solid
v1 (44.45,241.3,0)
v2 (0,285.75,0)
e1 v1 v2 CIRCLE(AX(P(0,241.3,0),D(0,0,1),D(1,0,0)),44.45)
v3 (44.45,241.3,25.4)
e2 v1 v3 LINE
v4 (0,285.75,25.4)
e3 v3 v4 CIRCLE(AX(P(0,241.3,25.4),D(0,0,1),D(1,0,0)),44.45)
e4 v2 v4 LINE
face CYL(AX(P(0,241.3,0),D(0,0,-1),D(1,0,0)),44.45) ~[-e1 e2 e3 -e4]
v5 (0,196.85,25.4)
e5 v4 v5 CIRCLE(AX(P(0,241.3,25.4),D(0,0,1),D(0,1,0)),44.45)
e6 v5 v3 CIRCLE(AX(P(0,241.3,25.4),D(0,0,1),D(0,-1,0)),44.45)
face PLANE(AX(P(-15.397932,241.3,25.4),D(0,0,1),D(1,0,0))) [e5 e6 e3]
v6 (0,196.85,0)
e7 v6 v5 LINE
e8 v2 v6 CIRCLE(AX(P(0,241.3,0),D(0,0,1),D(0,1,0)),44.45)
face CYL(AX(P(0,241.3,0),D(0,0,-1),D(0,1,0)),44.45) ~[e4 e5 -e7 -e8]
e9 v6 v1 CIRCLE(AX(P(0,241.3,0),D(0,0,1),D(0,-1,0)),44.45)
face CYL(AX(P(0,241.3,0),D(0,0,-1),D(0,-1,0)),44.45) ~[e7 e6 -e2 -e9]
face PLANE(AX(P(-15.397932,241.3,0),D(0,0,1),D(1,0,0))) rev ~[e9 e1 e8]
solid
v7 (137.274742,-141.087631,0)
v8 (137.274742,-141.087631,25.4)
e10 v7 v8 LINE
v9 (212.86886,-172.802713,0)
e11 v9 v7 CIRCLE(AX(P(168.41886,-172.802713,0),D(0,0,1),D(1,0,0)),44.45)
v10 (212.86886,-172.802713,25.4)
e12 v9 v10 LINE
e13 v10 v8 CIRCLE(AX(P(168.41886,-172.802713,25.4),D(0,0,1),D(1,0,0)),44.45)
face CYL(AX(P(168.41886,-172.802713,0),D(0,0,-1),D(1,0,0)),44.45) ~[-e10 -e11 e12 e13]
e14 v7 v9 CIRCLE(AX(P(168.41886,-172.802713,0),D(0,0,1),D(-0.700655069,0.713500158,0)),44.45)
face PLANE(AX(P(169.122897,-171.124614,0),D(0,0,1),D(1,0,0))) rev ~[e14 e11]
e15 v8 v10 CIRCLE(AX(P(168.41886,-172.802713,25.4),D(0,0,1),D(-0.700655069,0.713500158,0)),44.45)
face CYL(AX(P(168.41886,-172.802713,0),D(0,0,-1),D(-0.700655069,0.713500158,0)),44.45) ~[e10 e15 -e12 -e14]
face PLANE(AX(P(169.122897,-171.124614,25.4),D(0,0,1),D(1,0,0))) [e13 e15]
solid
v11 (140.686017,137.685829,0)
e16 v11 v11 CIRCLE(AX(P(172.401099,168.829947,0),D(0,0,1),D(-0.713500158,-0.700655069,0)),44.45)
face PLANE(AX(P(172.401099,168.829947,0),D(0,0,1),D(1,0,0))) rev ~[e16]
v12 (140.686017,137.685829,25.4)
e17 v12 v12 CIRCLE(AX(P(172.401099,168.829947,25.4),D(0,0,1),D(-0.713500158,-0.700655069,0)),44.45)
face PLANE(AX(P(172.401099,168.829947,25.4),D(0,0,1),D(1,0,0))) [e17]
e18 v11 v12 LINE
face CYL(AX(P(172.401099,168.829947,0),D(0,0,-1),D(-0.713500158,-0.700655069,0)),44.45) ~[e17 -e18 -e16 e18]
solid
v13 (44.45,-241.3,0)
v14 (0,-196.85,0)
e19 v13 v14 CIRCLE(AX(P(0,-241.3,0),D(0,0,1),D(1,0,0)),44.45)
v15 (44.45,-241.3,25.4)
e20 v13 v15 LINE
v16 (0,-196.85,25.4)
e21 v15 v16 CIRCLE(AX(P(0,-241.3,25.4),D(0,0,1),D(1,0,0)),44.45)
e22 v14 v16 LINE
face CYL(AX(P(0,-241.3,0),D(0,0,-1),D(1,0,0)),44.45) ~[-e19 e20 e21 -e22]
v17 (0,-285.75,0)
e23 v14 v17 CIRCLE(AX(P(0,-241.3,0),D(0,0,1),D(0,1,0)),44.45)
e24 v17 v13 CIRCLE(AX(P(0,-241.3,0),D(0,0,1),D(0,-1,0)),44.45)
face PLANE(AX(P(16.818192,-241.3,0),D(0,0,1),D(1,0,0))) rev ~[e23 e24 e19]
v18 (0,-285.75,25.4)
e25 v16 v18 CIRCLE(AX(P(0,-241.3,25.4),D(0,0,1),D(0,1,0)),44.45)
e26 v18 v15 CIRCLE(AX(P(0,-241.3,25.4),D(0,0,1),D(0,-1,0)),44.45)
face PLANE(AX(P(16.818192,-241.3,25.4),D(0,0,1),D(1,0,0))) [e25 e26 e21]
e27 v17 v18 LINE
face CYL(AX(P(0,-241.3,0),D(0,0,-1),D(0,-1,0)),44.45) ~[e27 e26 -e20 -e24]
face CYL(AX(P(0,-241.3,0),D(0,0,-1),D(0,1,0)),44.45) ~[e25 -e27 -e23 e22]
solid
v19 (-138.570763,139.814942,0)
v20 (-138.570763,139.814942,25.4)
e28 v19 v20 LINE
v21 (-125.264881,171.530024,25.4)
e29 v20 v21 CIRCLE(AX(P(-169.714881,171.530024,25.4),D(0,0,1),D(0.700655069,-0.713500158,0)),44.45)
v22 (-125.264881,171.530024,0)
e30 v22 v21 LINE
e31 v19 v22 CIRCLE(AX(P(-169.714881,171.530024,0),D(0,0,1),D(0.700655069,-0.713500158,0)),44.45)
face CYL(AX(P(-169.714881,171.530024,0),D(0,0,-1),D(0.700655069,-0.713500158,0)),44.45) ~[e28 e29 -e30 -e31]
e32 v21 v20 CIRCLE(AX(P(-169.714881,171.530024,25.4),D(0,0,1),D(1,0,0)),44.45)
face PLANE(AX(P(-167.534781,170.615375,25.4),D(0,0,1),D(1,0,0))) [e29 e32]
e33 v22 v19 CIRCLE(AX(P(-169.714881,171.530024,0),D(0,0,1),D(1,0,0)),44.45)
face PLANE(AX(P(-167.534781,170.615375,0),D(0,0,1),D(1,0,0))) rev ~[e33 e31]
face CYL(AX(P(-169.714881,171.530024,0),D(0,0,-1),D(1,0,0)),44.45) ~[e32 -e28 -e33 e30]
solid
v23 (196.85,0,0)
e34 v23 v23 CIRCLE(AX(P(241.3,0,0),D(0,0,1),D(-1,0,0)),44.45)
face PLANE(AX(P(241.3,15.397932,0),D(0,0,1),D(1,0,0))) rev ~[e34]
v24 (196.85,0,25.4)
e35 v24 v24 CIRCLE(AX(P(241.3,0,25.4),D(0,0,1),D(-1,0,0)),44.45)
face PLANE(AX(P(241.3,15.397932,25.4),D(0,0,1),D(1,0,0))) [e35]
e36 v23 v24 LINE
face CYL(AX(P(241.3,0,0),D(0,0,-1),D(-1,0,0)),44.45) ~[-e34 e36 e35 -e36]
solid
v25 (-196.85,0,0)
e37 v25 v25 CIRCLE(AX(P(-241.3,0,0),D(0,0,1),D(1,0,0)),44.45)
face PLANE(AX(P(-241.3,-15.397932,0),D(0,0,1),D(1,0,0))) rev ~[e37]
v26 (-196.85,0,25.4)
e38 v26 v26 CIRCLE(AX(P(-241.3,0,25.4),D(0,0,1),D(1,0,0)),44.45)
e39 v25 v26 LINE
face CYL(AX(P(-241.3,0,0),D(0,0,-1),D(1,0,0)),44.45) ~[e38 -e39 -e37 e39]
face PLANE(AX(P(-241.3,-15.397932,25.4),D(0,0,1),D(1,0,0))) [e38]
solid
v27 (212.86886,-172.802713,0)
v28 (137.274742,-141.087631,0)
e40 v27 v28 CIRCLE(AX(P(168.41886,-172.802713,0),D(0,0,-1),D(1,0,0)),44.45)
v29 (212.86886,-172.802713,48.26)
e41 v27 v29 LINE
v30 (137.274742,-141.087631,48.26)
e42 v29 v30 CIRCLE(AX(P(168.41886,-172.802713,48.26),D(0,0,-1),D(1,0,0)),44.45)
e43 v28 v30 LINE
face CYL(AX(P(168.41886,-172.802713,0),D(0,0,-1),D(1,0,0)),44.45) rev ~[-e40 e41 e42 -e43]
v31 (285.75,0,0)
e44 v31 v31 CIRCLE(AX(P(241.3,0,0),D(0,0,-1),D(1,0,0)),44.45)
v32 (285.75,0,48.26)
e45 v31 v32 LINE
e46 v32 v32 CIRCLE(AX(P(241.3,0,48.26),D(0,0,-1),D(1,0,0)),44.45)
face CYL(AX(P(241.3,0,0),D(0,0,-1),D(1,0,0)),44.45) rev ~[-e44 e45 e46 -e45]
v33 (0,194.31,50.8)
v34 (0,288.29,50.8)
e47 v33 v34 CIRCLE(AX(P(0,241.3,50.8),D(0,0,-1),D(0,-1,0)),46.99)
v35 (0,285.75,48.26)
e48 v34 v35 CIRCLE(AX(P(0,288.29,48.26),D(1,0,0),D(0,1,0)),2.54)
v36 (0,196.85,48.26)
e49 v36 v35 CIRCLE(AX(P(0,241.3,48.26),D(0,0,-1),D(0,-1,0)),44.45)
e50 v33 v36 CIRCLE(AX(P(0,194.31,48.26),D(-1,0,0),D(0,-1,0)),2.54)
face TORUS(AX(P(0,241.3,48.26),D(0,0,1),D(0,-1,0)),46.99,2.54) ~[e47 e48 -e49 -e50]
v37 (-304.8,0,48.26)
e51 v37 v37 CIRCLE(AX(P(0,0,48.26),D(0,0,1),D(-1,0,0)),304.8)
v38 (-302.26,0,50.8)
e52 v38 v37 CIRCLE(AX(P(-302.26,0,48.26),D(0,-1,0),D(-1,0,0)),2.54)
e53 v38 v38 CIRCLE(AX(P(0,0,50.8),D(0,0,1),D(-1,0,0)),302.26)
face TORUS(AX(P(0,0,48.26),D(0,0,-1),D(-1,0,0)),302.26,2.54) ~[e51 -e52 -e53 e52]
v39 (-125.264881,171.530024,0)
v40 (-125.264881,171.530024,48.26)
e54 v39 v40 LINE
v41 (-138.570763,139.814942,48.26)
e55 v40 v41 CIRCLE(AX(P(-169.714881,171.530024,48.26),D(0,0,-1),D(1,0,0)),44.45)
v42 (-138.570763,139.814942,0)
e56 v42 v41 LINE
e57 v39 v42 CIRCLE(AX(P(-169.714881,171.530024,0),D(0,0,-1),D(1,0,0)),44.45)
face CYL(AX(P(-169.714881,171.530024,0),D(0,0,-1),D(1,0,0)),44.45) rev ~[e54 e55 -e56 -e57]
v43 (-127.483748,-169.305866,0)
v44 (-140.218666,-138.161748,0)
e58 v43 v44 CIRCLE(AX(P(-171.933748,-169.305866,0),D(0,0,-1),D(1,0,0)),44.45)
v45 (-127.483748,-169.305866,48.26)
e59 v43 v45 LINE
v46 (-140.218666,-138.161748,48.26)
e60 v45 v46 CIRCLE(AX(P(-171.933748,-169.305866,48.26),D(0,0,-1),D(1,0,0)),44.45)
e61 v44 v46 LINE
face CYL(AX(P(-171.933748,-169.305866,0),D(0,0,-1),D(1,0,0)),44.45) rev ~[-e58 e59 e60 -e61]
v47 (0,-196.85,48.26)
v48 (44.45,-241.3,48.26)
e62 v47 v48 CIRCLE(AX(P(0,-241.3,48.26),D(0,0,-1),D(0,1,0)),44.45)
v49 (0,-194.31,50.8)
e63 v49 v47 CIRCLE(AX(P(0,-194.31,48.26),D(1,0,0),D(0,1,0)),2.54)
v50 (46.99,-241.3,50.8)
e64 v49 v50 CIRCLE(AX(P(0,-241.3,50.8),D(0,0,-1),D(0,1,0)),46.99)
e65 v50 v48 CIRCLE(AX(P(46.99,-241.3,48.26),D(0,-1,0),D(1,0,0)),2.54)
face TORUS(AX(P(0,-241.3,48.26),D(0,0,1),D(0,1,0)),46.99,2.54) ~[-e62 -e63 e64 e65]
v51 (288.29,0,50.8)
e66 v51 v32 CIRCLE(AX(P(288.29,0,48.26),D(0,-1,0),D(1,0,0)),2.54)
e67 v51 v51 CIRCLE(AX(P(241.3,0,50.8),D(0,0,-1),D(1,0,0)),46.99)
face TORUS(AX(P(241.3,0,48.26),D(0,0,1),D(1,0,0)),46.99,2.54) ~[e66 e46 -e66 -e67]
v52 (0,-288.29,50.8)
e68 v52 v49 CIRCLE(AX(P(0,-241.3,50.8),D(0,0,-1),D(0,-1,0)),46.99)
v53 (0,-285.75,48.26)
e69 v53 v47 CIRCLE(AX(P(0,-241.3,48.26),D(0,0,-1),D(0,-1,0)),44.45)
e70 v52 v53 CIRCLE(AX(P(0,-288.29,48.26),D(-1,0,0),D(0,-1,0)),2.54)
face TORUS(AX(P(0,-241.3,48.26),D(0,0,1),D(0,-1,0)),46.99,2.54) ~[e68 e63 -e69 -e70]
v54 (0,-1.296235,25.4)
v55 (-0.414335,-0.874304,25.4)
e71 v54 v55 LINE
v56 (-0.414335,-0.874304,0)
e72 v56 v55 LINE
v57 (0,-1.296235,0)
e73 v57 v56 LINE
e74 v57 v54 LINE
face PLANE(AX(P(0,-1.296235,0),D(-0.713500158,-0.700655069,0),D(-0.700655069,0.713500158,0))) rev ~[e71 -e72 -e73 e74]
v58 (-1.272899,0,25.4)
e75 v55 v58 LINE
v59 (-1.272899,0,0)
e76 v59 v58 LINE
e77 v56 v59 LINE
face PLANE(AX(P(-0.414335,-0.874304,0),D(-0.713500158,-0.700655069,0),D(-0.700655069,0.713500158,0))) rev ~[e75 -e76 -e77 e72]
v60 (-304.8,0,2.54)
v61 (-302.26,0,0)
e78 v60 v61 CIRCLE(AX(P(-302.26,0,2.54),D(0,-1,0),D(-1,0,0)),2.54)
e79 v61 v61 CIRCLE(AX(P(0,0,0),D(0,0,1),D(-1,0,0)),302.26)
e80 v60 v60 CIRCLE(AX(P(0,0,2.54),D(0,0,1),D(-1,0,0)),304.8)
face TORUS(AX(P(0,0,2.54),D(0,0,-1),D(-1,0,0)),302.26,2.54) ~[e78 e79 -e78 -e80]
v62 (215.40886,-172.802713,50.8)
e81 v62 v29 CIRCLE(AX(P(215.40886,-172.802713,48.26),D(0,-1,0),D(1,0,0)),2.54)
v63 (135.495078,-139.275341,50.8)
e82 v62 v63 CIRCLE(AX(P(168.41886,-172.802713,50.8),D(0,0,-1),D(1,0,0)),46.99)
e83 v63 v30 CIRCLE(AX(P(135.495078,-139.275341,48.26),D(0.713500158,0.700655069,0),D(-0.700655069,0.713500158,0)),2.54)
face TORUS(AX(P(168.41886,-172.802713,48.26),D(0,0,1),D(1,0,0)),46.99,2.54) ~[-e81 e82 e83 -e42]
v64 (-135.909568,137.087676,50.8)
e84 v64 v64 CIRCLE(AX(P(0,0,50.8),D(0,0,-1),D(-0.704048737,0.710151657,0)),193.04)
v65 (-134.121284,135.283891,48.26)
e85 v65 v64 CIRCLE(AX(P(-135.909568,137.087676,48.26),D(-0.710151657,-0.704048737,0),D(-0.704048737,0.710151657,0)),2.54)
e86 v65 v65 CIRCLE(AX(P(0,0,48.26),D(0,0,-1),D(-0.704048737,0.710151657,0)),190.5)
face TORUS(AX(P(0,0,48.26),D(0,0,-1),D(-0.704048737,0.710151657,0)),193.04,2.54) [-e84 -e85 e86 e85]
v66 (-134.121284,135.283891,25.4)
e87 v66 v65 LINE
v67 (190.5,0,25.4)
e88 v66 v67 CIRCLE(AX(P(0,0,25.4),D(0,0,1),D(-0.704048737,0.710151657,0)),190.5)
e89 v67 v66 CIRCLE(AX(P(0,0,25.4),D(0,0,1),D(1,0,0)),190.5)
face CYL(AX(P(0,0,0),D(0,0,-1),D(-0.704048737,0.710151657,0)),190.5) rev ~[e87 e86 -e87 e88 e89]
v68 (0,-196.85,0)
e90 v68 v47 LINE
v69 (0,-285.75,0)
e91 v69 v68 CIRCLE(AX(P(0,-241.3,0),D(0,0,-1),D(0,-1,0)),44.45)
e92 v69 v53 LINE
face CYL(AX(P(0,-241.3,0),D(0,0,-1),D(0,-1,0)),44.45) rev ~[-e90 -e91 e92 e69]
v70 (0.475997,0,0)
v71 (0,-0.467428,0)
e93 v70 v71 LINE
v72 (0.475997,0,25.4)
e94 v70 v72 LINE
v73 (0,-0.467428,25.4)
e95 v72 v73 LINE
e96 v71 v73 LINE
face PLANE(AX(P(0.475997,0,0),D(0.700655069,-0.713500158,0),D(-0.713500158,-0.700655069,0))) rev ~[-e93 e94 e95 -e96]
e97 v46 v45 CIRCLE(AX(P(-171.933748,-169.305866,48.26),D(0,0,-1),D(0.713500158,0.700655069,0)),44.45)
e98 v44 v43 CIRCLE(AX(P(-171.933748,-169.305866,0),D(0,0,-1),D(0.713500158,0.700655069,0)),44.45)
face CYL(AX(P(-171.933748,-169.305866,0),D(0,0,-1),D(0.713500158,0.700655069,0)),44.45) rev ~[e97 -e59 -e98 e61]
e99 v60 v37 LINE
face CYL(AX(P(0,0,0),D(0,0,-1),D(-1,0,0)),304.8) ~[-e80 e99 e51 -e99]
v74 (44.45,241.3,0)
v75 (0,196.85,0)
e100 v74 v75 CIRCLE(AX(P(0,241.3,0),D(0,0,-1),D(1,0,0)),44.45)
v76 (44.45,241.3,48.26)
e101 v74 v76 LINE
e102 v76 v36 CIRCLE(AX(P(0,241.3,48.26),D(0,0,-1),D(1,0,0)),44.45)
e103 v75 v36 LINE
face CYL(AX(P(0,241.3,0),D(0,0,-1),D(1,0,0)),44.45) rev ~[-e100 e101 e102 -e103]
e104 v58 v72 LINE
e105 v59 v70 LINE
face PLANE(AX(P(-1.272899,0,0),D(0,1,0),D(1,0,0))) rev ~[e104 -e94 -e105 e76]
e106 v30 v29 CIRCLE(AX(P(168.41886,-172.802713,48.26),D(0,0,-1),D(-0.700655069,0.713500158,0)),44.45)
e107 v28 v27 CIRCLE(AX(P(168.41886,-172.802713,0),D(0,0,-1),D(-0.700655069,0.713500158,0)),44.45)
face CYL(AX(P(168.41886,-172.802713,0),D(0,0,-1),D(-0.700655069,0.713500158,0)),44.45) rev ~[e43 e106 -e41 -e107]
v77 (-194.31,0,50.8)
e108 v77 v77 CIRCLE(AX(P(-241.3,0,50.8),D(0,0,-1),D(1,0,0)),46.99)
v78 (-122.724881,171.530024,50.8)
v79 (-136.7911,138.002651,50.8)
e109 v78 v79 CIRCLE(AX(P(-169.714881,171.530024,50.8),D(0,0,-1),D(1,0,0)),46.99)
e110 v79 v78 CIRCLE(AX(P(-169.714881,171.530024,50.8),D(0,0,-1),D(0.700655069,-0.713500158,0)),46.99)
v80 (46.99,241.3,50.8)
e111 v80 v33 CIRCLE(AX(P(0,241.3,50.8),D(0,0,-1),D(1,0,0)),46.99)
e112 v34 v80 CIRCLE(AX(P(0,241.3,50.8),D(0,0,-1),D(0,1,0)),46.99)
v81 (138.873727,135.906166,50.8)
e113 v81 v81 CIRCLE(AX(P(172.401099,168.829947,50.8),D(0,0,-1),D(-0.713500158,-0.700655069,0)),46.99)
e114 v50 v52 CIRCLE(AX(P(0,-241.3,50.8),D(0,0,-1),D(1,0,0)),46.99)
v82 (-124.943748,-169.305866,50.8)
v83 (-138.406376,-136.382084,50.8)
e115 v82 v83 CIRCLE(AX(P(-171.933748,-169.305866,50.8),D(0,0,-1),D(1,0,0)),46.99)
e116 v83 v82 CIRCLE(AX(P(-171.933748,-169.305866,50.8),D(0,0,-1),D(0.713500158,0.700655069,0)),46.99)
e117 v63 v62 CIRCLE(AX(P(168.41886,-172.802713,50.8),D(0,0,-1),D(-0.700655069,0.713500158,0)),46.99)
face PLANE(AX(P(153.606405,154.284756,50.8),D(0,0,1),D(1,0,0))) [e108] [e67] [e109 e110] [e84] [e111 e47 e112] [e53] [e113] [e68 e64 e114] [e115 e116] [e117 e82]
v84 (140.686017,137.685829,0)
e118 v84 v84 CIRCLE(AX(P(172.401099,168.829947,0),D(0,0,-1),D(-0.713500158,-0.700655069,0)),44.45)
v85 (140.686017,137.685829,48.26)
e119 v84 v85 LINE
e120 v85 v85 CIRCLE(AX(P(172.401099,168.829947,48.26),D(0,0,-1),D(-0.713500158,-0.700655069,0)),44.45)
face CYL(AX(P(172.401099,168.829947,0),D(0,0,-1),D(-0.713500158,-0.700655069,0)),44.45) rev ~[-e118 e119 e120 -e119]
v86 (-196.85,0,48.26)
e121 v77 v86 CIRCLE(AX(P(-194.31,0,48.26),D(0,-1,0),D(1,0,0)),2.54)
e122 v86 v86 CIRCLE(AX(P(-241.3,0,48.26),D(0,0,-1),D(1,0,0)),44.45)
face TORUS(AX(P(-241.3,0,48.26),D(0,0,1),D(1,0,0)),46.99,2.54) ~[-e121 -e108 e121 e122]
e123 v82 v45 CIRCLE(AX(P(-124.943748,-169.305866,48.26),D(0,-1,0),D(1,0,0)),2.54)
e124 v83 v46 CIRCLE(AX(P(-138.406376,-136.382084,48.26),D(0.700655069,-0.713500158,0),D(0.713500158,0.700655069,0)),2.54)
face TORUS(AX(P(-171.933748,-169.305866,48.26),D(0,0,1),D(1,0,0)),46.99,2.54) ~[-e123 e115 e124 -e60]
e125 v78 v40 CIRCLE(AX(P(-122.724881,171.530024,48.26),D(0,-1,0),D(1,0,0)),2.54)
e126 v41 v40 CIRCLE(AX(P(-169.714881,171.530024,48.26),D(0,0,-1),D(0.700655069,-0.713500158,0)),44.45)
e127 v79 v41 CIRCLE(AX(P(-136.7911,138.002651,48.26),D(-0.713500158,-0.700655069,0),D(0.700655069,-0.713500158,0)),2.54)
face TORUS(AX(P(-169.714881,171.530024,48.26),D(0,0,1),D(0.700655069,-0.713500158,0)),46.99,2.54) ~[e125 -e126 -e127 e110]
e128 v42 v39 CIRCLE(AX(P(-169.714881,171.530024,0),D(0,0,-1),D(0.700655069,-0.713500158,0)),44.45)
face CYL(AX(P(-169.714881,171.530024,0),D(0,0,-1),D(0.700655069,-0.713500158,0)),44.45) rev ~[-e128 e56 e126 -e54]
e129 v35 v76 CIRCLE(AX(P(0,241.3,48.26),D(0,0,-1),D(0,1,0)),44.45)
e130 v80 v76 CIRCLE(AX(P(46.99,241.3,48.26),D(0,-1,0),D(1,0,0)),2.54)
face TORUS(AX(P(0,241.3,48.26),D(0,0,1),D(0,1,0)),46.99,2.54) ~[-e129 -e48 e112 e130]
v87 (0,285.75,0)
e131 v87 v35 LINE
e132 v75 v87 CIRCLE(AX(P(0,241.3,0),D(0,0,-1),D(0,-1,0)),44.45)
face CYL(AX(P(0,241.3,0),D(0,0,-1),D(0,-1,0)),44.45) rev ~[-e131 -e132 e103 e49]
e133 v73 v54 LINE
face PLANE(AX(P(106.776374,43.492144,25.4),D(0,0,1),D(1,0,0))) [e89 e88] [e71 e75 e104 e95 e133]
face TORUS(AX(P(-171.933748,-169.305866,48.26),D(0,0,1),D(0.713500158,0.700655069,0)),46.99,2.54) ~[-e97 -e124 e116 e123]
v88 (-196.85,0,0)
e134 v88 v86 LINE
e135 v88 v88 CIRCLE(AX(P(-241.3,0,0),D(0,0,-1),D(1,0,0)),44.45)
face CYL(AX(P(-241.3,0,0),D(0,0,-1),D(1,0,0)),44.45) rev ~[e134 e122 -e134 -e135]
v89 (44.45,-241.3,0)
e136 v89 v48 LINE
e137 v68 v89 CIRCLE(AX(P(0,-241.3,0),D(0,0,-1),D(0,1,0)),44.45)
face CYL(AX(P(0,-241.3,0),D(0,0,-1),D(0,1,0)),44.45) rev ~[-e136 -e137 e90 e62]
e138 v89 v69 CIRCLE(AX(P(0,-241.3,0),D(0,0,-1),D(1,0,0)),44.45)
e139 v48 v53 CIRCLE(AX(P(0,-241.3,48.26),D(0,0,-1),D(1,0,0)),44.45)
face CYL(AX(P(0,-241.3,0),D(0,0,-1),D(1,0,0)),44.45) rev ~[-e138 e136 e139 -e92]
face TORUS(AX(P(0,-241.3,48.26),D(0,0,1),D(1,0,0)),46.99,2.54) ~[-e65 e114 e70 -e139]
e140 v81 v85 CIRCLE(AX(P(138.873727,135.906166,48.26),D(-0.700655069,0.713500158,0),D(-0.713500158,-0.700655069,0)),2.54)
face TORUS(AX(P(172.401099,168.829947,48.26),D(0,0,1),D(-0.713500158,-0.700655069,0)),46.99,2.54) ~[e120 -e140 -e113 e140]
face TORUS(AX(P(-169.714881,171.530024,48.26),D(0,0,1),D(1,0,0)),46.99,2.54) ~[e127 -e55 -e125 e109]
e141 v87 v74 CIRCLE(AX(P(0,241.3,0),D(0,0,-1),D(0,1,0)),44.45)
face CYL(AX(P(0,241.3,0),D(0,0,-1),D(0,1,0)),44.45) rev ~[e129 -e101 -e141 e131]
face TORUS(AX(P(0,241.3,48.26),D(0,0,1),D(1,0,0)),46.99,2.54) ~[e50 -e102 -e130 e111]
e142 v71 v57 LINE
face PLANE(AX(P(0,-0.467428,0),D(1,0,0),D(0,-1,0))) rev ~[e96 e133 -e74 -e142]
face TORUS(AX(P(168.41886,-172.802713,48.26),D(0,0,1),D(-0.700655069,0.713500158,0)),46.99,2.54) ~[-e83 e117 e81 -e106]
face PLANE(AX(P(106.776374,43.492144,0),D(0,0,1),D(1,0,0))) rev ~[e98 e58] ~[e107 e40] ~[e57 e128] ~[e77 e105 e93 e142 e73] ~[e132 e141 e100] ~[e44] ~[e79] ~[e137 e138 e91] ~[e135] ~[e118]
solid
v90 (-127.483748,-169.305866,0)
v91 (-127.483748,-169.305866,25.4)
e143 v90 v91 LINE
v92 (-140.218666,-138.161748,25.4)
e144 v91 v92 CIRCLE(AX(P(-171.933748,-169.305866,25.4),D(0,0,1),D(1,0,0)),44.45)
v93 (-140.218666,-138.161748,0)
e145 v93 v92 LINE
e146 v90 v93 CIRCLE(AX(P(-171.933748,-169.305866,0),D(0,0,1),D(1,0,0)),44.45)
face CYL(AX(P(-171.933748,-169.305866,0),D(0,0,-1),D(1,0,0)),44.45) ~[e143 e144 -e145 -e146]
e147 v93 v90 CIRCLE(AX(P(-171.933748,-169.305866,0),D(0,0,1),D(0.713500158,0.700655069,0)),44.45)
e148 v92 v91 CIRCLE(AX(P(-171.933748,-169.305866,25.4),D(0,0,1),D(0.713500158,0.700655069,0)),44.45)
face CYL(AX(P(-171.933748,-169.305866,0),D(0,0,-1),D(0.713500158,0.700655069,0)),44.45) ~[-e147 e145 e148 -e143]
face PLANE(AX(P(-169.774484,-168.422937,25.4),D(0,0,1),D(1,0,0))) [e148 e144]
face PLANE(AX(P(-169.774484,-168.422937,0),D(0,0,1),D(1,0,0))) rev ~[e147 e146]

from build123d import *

# Parameters (mm, degrees)
F1_DEPTH = 50.8
F2_DEPTH = 25.4
F3_DEPTH = 25.4
F4_R     = 2.54


with BuildPart() as f1:
    # F0 (on Top) → F1 (new body)
    with BuildSketch(Plane.XY):
        with BuildLine():
            Line((285.75, 0), (304.8, 0))
            ThreePointArc((304.8, 0), (215.5261469057, 215.5261469057), (0, 304.8))
            Line((0, 304.8), (0, 285.75))
            ThreePointArc((0, 285.75), (31.4308964237, 272.7308964237), (44.45, 241.3))
            ThreePointArc((44.45, 241.3), (31.4308964237, 209.8691035763), (0, 196.85))
            Line((0, 196.85), (0, 190.5))
            ThreePointArc((0, 190.5), (73.853478682, 175.6015765492), (136.1552471412, 133.2366266306))
            ThreePointArc((136.1552471412, 133.2366266306), (176.3913611552, 71.9467699747), (190.5, 0))
            Line((190.5, 0), (196.85, 0))
            ThreePointArc((196.85, 0), (241.3, 44.45), (285.75, 0))
        make_face()
        with BuildLine():
            ThreePointArc((216.8510989977, 168.8299471788), (189.2247000531, 127.686673761), (140.6860169942, 137.6858293793))
            ThreePointArc((140.6860169942, 137.6858293793), (155.5774979423, 209.9732205965), (216.8510989977, 168.8299471788))
        make_face(mode=Mode.SUBTRACT)
        with BuildLine():
            ThreePointArc((0, -304.8), (215.5261469057, -215.5261469057), (304.8, 0))
            Line((304.8, 0), (285.75, 0))
            ThreePointArc((285.75, 0), (241.3, -44.45), (196.85, 0))
            Line((196.85, 0), (190.5, 0))
            ThreePointArc((190.5, 0), (175.4899748966, -74.1182751471), (132.825262879, -136.5565799994))
            ThreePointArc((132.825262879, -136.5565799994), (71.6806163133, -176.499686246), (0, -190.5))
            Line((0, -190.5), (0, -196.85))
            ThreePointArc((0, -196.85), (31.4308964237, -209.8691035763), (44.45, -241.3))
            ThreePointArc((44.45, -241.3), (31.4308964237, -272.7308964237), (0, -285.75))
            Line((0, -285.75), (0, -304.8))
        make_face()
        with BuildLine():
            ThreePointArc((212.8688597149, -172.8027132088), (151.2222544713, -213.791483233), (137.2747419154, -141.0876312053))
            ThreePointArc((137.2747419154, -141.0876312053), (185.6154649585, -131.8139431847), (212.8688597149, -172.8027132088))
        make_face(mode=Mode.SUBTRACT)
        with BuildLine():
            Line((0, 285.75), (0, 304.8))
            ThreePointArc((0, 304.8), (-215.5261469057, 215.5261469057), (-304.8, 0))
            Line((-304.8, 0), (-285.75, 0))
            ThreePointArc((-285.75, 0), (-241.3, 44.45), (-196.85, 0))
            Line((-196.85, 0), (-190.5, 0))
            ThreePointArc((-190.5, 0), (-175.8413413963, 73.2807795807), (-134.1212844519, 135.283890604))
            ThreePointArc((-134.1212844519, 135.283890604), (-72.5212687421, 176.1559410864), (0, 190.5))
            Line((0, 190.5), (0, 196.85))
            ThreePointArc((0, 196.85), (-44.45, 241.3), (0, 285.75))
        make_face()
        with BuildLine():
            ThreePointArc((-125.2648812879, 171.5300238135), (-128.7261112637, 154.3334185698), (-138.5707634883, 139.81494181))
            ThreePointArc((-138.5707634883, 139.81494181), (-210.703651312, 188.7266290571), (-125.2648812879, 171.5300238135))
        make_face(mode=Mode.SUBTRACT)
        with BuildLine():
            ThreePointArc((-304.8, 0), (-215.5261469057, -215.5261469057), (0, -304.8))
            Line((0, -304.8), (0, -285.75))
            ThreePointArc((0, -285.75), (-44.45, -241.3), (0, -196.85))
            Line((0, -196.85), (0, -190.5))
            ThreePointArc((0, -190.5), (-73.5459383628, -175.7306033403), (-135.6878962911, -133.7125454103))
            ThreePointArc((-135.6878962911, -133.7125454103), (-176.265133029, -72.2554695388), (-190.5, 0))
            Line((-190.5, 0), (-196.85, 0))
            ThreePointArc((-196.85, 0), (-241.3, -44.45), (-285.75, 0))
            Line((-285.75, 0), (-304.8, 0))
        make_face()
        with BuildLine():
            ThreePointArc((-127.4837481475, -169.3058659585), (-213.0770215653, -186.1294670139), (-140.218666144, -138.1617481589))
            ThreePointArc((-140.218666144, -138.1617481589), (-130.7904747298, -152.482264903), (-127.4837481475, -169.3058659585))
        make_face(mode=Mode.SUBTRACT)
    extrude(amount=F1_DEPTH)

    # F0 (on Top) → F2, piece 9 (join)
    with BuildSketch(Plane.XY):
        with BuildLine():
            Line((0.4759973175, 0), (190.5, 0))
            ThreePointArc((190.5, 0), (176.3913611552, 71.9467699747), (136.1552471412, 133.2366266306))
            Line((136.1552471412, 133.2366266306), (0.4759973175, 0))
        make_face()
        with BuildLine():
            ThreePointArc((132.825262879, -136.5565799994), (175.4899748966, -74.1182751471), (190.5, 0))
            Line((190.5, 0), (0.4759973175, 0))
            Line((0.4759973175, 0), (0, -0.467427974))
            Line((0, -0.467427974), (0, -1.296235447))
            Line((0, -1.296235447), (132.825262879, -136.5565799994))
        make_face()
        with BuildLine():
            Line((0, 0), (0, 190.5))
            ThreePointArc((0, 190.5), (-72.5212687421, 176.1559410864), (-134.1212844519, 135.283890604))
            Line((-134.1212844519, 135.283890604), (-1.2728994191, 0))
            Line((-1.2728994191, 0), (0, 0))
        make_face()
        with BuildLine():
            ThreePointArc((136.1552471412, 133.2366266306), (73.853478682, 175.6015765492), (0, 190.5))
            Line((0, 190.5), (0, 0))
            Line((0, 0), (0.4759973175, 0))
            Line((0.4759973175, 0), (136.1552471412, 133.2366266306))
        make_face()
        with BuildLine():
            Line((0, -1.296235447), (0, -190.5))
            ThreePointArc((0, -190.5), (71.6806163133, -176.499686246), (132.825262879, -136.5565799994))
            Line((132.825262879, -136.5565799994), (0, -1.296235447))
        make_face()
        with BuildLine():
            ThreePointArc((-135.6878962911, -133.7125454103), (-73.5459383628, -175.7306033403), (0, -190.5))
            Line((0, -190.5), (0, -1.296235447))
            Line((0, -1.296235447), (-0.4143353614, -0.8743040875))
            Line((-0.4143353614, -0.8743040875), (-135.6878962911, -133.7125454103))
        make_face()
        with BuildLine():
            Line((-1.2728994191, 0), (-190.5, 0))
            ThreePointArc((-190.5, 0), (-176.265133029, -72.2554695388), (-135.6878962911, -133.7125454103))
            Line((-135.6878962911, -133.7125454103), (-0.4143353614, -0.8743040875))
            Line((-0.4143353614, -0.8743040875), (-1.2728994191, 0))
        make_face()
        with BuildLine():
            ThreePointArc((-134.1212844519, 135.283890604), (-175.8413413963, 73.2807795807), (-190.5, 0))
            Line((-190.5, 0), (-1.2728994191, 0))
            Line((-1.2728994191, 0), (-134.1212844519, 135.283890604))
        make_face()
    extrude(amount=F2_DEPTH)

    # F0 (on Top) → F3 (join)
    with BuildSketch(Plane.XY):
        with BuildLine():
            Line((-1.2728994191, 0), (-190.5, 0))
            ThreePointArc((-190.5, 0), (-176.265133029, -72.2554695388), (-135.6878962911, -133.7125454103))
            Line((-135.6878962911, -133.7125454103), (-0.4143353614, -0.8743040875))
            Line((-0.4143353614, -0.8743040875), (-1.2728994191, 0))
        make_face()
        with BuildLine():
            ThreePointArc((-135.6878962911, -133.7125454103), (-73.5459383628, -175.7306033403), (0, -190.5))
            Line((0, -190.5), (0, -1.296235447))
            Line((0, -1.296235447), (-0.4143353614, -0.8743040875))
            Line((-0.4143353614, -0.8743040875), (-135.6878962911, -133.7125454103))
        make_face()
        with BuildLine():
            Line((0, -1.296235447), (0, -190.5))
            ThreePointArc((0, -190.5), (71.6806163133, -176.499686246), (132.825262879, -136.5565799994))
            Line((132.825262879, -136.5565799994), (0, -1.296235447))
        make_face()
        with BuildLine():
            ThreePointArc((132.825262879, -136.5565799994), (175.4899748966, -74.1182751471), (190.5, 0))
            Line((190.5, 0), (0.4759973175, 0))
            Line((0.4759973175, 0), (0, -0.467427974))
            Line((0, -0.467427974), (0, -1.296235447))
            Line((0, -1.296235447), (132.825262879, -136.5565799994))
        make_face()
        with BuildLine():
            Line((0.4759973175, 0), (190.5, 0))
            ThreePointArc((190.5, 0), (176.3913611552, 71.9467699747), (136.1552471412, 133.2366266306))
            Line((136.1552471412, 133.2366266306), (0.4759973175, 0))
        make_face()
        with BuildLine():
            ThreePointArc((136.1552471412, 133.2366266306), (73.853478682, 175.6015765492), (0, 190.5))
            Line((0, 190.5), (0, 0))
            Line((0, 0), (0.4759973175, 0))
            Line((0.4759973175, 0), (136.1552471412, 133.2366266306))
        make_face()
        with BuildLine():
            Line((0, 0), (0, 190.5))
            ThreePointArc((0, 190.5), (-72.5212687421, 176.1559410864), (-134.1212844519, 135.283890604))
            Line((-134.1212844519, 135.283890604), (-1.2728994191, 0))
            Line((-1.2728994191, 0), (0, 0))
        make_face()
        with BuildLine():
            ThreePointArc((-134.1212844519, 135.283890604), (-175.8413413963, 73.2807795807), (-190.5, 0))
            Line((-190.5, 0), (-1.2728994191, 0))
            Line((-1.2728994191, 0), (-134.1212844519, 135.283890604))
        make_face()
    extrude(amount=F3_DEPTH)

    # F4
    f4_edges = [f1.edges().sort_by_distance(p)[0] for p in [
        (196.85, 0, 50.8),
        (0, 285.75, 50.8),
        (0, -196.85, 50.8),
        (304.8, 0, 50.8),
        (-285.75, 0, 50.8),
        (0, 190.5, 50.8),
        (204.116181, 199.974065, 50.8),
        (199.562978, -204.517795, 50.8),
        (-214.164881, 171.530024, 50.8),
        (-203.64883, -200.449984, 50.8),
        (304.8, 0, 0),
    ]]
    fillet(f4_edges, radius=F4_R)


with BuildPart() as f2:
    # F0 (on Top) → F2 (new body)
    with BuildSketch(Plane.XY):
        with BuildLine():
            ThreePointArc((216.8510989977, 168.8299471788), (155.5774979423, 209.9732205965), (140.6860169942, 137.6858293793))
            ThreePointArc((140.6860169942, 137.6858293793), (189.2247000531, 127.686673761), (216.8510989977, 168.8299471788))
        make_face()
    extrude(amount=F2_DEPTH)


with BuildPart() as f2b:
    # F0 (on Top) → F2, piece 2 (new body)
    with BuildSketch(Plane.XY):
        with BuildLine():
            ThreePointArc((212.8688597149, -172.8027132088), (185.6154649585, -131.8139431847), (137.2747419154, -141.0876312053))
            ThreePointArc((137.2747419154, -141.0876312053), (151.2222544713, -213.791483233), (212.8688597149, -172.8027132088))
        make_face()
    extrude(amount=F2_DEPTH)


with BuildPart() as f2c:
    # F0 (on Top) → F2, piece 3 (new body)
    with BuildSketch(Plane.XY):
        with BuildLine():
            ThreePointArc((-125.2648812879, 171.5300238135), (-210.703651312, 188.7266290571), (-138.5707634883, 139.81494181))
            ThreePointArc((-138.5707634883, 139.81494181), (-128.7261112637, 154.3334185698), (-125.2648812879, 171.5300238135))
        make_face()
    extrude(amount=F2_DEPTH)


with BuildPart() as f2d:
    # F0 (on Top) → F2, piece 4 (new body)
    with BuildSketch(Plane.XY):
        with BuildLine():
            ThreePointArc((-127.4837481475, -169.3058659585), (-130.7904747298, -152.482264903), (-140.218666144, -138.1617481589))
            ThreePointArc((-140.218666144, -138.1617481589), (-213.0770215653, -186.1294670139), (-127.4837481475, -169.3058659585))
        make_face()
    extrude(amount=F2_DEPTH)


with BuildPart() as f2e:
    # F0 (on Top) → F2, piece 5 (new body)
    with BuildSketch(Plane.XY):
        with BuildLine():
            Line((241.3, 0), (285.75, 0))
            ThreePointArc((285.75, 0), (241.3, 44.45), (196.85, 0))
            Line((196.85, 0), (241.3, 0))
        make_face()
        with BuildLine():
            ThreePointArc((196.85, 0), (241.3, -44.45), (285.75, 0))
            Line((285.75, 0), (241.3, 0))
            Line((241.3, 0), (196.85, 0))
        make_face()
    extrude(amount=F2_DEPTH)


with BuildPart() as f2f:
    # F0 (on Top) → F2, piece 6 (new body)
    with BuildSketch(Plane.XY):
        with BuildLine():
            Line((0, 241.3), (0, 285.75))
            ThreePointArc((0, 285.75), (-44.45, 241.3), (0, 196.85))
            Line((0, 196.85), (0, 241.3))
        make_face()
        with BuildLine():
            ThreePointArc((44.45, 241.3), (31.4308964237, 272.7308964237), (0, 285.75))
            Line((0, 285.75), (0, 241.3))
            Line((0, 241.3), (0, 196.85))
            ThreePointArc((0, 196.85), (31.4308964237, 209.8691035763), (44.45, 241.3))
        make_face()
    extrude(amount=F2_DEPTH)


with BuildPart() as f2g:
    # F0 (on Top) → F2, piece 7 (new body)
    with BuildSketch(Plane.XY):
        with BuildLine():
            Line((0, -241.3), (0, -285.75))
            ThreePointArc((0, -285.75), (31.4308964237, -272.7308964237), (44.45, -241.3))
            ThreePointArc((44.45, -241.3), (31.4308964237, -209.8691035763), (0, -196.85))
            Line((0, -196.85), (0, -241.3))
        make_face()
        with BuildLine():
            ThreePointArc((0, -196.85), (-44.45, -241.3), (0, -285.75))
            Line((0, -285.75), (0, -241.3))
            Line((0, -241.3), (0, -196.85))
        make_face()
    extrude(amount=F2_DEPTH)


with BuildPart() as f2h:
    # F0 (on Top) → F2, piece 8 (new body)
    with BuildSketch(Plane.XY):
        with BuildLine():
            Line((-241.3, 0), (-285.75, 0))
            ThreePointArc((-285.75, 0), (-241.3, -44.45), (-196.85, 0))
            Line((-196.85, 0), (-241.3, 0))
        make_face()
        with BuildLine():
            ThreePointArc((-196.85, 0), (-241.3, 44.45), (-285.75, 0))
            Line((-285.75, 0), (-241.3, 0))
            Line((-241.3, 0), (-196.85, 0))
        make_face()
    extrude(amount=F2_DEPTH)


solid = Compound([f1.part, f2.part, f2b.part, f2c.part, f2d.part, f2e.part, f2f.part, f2g.part, f2h.part])
